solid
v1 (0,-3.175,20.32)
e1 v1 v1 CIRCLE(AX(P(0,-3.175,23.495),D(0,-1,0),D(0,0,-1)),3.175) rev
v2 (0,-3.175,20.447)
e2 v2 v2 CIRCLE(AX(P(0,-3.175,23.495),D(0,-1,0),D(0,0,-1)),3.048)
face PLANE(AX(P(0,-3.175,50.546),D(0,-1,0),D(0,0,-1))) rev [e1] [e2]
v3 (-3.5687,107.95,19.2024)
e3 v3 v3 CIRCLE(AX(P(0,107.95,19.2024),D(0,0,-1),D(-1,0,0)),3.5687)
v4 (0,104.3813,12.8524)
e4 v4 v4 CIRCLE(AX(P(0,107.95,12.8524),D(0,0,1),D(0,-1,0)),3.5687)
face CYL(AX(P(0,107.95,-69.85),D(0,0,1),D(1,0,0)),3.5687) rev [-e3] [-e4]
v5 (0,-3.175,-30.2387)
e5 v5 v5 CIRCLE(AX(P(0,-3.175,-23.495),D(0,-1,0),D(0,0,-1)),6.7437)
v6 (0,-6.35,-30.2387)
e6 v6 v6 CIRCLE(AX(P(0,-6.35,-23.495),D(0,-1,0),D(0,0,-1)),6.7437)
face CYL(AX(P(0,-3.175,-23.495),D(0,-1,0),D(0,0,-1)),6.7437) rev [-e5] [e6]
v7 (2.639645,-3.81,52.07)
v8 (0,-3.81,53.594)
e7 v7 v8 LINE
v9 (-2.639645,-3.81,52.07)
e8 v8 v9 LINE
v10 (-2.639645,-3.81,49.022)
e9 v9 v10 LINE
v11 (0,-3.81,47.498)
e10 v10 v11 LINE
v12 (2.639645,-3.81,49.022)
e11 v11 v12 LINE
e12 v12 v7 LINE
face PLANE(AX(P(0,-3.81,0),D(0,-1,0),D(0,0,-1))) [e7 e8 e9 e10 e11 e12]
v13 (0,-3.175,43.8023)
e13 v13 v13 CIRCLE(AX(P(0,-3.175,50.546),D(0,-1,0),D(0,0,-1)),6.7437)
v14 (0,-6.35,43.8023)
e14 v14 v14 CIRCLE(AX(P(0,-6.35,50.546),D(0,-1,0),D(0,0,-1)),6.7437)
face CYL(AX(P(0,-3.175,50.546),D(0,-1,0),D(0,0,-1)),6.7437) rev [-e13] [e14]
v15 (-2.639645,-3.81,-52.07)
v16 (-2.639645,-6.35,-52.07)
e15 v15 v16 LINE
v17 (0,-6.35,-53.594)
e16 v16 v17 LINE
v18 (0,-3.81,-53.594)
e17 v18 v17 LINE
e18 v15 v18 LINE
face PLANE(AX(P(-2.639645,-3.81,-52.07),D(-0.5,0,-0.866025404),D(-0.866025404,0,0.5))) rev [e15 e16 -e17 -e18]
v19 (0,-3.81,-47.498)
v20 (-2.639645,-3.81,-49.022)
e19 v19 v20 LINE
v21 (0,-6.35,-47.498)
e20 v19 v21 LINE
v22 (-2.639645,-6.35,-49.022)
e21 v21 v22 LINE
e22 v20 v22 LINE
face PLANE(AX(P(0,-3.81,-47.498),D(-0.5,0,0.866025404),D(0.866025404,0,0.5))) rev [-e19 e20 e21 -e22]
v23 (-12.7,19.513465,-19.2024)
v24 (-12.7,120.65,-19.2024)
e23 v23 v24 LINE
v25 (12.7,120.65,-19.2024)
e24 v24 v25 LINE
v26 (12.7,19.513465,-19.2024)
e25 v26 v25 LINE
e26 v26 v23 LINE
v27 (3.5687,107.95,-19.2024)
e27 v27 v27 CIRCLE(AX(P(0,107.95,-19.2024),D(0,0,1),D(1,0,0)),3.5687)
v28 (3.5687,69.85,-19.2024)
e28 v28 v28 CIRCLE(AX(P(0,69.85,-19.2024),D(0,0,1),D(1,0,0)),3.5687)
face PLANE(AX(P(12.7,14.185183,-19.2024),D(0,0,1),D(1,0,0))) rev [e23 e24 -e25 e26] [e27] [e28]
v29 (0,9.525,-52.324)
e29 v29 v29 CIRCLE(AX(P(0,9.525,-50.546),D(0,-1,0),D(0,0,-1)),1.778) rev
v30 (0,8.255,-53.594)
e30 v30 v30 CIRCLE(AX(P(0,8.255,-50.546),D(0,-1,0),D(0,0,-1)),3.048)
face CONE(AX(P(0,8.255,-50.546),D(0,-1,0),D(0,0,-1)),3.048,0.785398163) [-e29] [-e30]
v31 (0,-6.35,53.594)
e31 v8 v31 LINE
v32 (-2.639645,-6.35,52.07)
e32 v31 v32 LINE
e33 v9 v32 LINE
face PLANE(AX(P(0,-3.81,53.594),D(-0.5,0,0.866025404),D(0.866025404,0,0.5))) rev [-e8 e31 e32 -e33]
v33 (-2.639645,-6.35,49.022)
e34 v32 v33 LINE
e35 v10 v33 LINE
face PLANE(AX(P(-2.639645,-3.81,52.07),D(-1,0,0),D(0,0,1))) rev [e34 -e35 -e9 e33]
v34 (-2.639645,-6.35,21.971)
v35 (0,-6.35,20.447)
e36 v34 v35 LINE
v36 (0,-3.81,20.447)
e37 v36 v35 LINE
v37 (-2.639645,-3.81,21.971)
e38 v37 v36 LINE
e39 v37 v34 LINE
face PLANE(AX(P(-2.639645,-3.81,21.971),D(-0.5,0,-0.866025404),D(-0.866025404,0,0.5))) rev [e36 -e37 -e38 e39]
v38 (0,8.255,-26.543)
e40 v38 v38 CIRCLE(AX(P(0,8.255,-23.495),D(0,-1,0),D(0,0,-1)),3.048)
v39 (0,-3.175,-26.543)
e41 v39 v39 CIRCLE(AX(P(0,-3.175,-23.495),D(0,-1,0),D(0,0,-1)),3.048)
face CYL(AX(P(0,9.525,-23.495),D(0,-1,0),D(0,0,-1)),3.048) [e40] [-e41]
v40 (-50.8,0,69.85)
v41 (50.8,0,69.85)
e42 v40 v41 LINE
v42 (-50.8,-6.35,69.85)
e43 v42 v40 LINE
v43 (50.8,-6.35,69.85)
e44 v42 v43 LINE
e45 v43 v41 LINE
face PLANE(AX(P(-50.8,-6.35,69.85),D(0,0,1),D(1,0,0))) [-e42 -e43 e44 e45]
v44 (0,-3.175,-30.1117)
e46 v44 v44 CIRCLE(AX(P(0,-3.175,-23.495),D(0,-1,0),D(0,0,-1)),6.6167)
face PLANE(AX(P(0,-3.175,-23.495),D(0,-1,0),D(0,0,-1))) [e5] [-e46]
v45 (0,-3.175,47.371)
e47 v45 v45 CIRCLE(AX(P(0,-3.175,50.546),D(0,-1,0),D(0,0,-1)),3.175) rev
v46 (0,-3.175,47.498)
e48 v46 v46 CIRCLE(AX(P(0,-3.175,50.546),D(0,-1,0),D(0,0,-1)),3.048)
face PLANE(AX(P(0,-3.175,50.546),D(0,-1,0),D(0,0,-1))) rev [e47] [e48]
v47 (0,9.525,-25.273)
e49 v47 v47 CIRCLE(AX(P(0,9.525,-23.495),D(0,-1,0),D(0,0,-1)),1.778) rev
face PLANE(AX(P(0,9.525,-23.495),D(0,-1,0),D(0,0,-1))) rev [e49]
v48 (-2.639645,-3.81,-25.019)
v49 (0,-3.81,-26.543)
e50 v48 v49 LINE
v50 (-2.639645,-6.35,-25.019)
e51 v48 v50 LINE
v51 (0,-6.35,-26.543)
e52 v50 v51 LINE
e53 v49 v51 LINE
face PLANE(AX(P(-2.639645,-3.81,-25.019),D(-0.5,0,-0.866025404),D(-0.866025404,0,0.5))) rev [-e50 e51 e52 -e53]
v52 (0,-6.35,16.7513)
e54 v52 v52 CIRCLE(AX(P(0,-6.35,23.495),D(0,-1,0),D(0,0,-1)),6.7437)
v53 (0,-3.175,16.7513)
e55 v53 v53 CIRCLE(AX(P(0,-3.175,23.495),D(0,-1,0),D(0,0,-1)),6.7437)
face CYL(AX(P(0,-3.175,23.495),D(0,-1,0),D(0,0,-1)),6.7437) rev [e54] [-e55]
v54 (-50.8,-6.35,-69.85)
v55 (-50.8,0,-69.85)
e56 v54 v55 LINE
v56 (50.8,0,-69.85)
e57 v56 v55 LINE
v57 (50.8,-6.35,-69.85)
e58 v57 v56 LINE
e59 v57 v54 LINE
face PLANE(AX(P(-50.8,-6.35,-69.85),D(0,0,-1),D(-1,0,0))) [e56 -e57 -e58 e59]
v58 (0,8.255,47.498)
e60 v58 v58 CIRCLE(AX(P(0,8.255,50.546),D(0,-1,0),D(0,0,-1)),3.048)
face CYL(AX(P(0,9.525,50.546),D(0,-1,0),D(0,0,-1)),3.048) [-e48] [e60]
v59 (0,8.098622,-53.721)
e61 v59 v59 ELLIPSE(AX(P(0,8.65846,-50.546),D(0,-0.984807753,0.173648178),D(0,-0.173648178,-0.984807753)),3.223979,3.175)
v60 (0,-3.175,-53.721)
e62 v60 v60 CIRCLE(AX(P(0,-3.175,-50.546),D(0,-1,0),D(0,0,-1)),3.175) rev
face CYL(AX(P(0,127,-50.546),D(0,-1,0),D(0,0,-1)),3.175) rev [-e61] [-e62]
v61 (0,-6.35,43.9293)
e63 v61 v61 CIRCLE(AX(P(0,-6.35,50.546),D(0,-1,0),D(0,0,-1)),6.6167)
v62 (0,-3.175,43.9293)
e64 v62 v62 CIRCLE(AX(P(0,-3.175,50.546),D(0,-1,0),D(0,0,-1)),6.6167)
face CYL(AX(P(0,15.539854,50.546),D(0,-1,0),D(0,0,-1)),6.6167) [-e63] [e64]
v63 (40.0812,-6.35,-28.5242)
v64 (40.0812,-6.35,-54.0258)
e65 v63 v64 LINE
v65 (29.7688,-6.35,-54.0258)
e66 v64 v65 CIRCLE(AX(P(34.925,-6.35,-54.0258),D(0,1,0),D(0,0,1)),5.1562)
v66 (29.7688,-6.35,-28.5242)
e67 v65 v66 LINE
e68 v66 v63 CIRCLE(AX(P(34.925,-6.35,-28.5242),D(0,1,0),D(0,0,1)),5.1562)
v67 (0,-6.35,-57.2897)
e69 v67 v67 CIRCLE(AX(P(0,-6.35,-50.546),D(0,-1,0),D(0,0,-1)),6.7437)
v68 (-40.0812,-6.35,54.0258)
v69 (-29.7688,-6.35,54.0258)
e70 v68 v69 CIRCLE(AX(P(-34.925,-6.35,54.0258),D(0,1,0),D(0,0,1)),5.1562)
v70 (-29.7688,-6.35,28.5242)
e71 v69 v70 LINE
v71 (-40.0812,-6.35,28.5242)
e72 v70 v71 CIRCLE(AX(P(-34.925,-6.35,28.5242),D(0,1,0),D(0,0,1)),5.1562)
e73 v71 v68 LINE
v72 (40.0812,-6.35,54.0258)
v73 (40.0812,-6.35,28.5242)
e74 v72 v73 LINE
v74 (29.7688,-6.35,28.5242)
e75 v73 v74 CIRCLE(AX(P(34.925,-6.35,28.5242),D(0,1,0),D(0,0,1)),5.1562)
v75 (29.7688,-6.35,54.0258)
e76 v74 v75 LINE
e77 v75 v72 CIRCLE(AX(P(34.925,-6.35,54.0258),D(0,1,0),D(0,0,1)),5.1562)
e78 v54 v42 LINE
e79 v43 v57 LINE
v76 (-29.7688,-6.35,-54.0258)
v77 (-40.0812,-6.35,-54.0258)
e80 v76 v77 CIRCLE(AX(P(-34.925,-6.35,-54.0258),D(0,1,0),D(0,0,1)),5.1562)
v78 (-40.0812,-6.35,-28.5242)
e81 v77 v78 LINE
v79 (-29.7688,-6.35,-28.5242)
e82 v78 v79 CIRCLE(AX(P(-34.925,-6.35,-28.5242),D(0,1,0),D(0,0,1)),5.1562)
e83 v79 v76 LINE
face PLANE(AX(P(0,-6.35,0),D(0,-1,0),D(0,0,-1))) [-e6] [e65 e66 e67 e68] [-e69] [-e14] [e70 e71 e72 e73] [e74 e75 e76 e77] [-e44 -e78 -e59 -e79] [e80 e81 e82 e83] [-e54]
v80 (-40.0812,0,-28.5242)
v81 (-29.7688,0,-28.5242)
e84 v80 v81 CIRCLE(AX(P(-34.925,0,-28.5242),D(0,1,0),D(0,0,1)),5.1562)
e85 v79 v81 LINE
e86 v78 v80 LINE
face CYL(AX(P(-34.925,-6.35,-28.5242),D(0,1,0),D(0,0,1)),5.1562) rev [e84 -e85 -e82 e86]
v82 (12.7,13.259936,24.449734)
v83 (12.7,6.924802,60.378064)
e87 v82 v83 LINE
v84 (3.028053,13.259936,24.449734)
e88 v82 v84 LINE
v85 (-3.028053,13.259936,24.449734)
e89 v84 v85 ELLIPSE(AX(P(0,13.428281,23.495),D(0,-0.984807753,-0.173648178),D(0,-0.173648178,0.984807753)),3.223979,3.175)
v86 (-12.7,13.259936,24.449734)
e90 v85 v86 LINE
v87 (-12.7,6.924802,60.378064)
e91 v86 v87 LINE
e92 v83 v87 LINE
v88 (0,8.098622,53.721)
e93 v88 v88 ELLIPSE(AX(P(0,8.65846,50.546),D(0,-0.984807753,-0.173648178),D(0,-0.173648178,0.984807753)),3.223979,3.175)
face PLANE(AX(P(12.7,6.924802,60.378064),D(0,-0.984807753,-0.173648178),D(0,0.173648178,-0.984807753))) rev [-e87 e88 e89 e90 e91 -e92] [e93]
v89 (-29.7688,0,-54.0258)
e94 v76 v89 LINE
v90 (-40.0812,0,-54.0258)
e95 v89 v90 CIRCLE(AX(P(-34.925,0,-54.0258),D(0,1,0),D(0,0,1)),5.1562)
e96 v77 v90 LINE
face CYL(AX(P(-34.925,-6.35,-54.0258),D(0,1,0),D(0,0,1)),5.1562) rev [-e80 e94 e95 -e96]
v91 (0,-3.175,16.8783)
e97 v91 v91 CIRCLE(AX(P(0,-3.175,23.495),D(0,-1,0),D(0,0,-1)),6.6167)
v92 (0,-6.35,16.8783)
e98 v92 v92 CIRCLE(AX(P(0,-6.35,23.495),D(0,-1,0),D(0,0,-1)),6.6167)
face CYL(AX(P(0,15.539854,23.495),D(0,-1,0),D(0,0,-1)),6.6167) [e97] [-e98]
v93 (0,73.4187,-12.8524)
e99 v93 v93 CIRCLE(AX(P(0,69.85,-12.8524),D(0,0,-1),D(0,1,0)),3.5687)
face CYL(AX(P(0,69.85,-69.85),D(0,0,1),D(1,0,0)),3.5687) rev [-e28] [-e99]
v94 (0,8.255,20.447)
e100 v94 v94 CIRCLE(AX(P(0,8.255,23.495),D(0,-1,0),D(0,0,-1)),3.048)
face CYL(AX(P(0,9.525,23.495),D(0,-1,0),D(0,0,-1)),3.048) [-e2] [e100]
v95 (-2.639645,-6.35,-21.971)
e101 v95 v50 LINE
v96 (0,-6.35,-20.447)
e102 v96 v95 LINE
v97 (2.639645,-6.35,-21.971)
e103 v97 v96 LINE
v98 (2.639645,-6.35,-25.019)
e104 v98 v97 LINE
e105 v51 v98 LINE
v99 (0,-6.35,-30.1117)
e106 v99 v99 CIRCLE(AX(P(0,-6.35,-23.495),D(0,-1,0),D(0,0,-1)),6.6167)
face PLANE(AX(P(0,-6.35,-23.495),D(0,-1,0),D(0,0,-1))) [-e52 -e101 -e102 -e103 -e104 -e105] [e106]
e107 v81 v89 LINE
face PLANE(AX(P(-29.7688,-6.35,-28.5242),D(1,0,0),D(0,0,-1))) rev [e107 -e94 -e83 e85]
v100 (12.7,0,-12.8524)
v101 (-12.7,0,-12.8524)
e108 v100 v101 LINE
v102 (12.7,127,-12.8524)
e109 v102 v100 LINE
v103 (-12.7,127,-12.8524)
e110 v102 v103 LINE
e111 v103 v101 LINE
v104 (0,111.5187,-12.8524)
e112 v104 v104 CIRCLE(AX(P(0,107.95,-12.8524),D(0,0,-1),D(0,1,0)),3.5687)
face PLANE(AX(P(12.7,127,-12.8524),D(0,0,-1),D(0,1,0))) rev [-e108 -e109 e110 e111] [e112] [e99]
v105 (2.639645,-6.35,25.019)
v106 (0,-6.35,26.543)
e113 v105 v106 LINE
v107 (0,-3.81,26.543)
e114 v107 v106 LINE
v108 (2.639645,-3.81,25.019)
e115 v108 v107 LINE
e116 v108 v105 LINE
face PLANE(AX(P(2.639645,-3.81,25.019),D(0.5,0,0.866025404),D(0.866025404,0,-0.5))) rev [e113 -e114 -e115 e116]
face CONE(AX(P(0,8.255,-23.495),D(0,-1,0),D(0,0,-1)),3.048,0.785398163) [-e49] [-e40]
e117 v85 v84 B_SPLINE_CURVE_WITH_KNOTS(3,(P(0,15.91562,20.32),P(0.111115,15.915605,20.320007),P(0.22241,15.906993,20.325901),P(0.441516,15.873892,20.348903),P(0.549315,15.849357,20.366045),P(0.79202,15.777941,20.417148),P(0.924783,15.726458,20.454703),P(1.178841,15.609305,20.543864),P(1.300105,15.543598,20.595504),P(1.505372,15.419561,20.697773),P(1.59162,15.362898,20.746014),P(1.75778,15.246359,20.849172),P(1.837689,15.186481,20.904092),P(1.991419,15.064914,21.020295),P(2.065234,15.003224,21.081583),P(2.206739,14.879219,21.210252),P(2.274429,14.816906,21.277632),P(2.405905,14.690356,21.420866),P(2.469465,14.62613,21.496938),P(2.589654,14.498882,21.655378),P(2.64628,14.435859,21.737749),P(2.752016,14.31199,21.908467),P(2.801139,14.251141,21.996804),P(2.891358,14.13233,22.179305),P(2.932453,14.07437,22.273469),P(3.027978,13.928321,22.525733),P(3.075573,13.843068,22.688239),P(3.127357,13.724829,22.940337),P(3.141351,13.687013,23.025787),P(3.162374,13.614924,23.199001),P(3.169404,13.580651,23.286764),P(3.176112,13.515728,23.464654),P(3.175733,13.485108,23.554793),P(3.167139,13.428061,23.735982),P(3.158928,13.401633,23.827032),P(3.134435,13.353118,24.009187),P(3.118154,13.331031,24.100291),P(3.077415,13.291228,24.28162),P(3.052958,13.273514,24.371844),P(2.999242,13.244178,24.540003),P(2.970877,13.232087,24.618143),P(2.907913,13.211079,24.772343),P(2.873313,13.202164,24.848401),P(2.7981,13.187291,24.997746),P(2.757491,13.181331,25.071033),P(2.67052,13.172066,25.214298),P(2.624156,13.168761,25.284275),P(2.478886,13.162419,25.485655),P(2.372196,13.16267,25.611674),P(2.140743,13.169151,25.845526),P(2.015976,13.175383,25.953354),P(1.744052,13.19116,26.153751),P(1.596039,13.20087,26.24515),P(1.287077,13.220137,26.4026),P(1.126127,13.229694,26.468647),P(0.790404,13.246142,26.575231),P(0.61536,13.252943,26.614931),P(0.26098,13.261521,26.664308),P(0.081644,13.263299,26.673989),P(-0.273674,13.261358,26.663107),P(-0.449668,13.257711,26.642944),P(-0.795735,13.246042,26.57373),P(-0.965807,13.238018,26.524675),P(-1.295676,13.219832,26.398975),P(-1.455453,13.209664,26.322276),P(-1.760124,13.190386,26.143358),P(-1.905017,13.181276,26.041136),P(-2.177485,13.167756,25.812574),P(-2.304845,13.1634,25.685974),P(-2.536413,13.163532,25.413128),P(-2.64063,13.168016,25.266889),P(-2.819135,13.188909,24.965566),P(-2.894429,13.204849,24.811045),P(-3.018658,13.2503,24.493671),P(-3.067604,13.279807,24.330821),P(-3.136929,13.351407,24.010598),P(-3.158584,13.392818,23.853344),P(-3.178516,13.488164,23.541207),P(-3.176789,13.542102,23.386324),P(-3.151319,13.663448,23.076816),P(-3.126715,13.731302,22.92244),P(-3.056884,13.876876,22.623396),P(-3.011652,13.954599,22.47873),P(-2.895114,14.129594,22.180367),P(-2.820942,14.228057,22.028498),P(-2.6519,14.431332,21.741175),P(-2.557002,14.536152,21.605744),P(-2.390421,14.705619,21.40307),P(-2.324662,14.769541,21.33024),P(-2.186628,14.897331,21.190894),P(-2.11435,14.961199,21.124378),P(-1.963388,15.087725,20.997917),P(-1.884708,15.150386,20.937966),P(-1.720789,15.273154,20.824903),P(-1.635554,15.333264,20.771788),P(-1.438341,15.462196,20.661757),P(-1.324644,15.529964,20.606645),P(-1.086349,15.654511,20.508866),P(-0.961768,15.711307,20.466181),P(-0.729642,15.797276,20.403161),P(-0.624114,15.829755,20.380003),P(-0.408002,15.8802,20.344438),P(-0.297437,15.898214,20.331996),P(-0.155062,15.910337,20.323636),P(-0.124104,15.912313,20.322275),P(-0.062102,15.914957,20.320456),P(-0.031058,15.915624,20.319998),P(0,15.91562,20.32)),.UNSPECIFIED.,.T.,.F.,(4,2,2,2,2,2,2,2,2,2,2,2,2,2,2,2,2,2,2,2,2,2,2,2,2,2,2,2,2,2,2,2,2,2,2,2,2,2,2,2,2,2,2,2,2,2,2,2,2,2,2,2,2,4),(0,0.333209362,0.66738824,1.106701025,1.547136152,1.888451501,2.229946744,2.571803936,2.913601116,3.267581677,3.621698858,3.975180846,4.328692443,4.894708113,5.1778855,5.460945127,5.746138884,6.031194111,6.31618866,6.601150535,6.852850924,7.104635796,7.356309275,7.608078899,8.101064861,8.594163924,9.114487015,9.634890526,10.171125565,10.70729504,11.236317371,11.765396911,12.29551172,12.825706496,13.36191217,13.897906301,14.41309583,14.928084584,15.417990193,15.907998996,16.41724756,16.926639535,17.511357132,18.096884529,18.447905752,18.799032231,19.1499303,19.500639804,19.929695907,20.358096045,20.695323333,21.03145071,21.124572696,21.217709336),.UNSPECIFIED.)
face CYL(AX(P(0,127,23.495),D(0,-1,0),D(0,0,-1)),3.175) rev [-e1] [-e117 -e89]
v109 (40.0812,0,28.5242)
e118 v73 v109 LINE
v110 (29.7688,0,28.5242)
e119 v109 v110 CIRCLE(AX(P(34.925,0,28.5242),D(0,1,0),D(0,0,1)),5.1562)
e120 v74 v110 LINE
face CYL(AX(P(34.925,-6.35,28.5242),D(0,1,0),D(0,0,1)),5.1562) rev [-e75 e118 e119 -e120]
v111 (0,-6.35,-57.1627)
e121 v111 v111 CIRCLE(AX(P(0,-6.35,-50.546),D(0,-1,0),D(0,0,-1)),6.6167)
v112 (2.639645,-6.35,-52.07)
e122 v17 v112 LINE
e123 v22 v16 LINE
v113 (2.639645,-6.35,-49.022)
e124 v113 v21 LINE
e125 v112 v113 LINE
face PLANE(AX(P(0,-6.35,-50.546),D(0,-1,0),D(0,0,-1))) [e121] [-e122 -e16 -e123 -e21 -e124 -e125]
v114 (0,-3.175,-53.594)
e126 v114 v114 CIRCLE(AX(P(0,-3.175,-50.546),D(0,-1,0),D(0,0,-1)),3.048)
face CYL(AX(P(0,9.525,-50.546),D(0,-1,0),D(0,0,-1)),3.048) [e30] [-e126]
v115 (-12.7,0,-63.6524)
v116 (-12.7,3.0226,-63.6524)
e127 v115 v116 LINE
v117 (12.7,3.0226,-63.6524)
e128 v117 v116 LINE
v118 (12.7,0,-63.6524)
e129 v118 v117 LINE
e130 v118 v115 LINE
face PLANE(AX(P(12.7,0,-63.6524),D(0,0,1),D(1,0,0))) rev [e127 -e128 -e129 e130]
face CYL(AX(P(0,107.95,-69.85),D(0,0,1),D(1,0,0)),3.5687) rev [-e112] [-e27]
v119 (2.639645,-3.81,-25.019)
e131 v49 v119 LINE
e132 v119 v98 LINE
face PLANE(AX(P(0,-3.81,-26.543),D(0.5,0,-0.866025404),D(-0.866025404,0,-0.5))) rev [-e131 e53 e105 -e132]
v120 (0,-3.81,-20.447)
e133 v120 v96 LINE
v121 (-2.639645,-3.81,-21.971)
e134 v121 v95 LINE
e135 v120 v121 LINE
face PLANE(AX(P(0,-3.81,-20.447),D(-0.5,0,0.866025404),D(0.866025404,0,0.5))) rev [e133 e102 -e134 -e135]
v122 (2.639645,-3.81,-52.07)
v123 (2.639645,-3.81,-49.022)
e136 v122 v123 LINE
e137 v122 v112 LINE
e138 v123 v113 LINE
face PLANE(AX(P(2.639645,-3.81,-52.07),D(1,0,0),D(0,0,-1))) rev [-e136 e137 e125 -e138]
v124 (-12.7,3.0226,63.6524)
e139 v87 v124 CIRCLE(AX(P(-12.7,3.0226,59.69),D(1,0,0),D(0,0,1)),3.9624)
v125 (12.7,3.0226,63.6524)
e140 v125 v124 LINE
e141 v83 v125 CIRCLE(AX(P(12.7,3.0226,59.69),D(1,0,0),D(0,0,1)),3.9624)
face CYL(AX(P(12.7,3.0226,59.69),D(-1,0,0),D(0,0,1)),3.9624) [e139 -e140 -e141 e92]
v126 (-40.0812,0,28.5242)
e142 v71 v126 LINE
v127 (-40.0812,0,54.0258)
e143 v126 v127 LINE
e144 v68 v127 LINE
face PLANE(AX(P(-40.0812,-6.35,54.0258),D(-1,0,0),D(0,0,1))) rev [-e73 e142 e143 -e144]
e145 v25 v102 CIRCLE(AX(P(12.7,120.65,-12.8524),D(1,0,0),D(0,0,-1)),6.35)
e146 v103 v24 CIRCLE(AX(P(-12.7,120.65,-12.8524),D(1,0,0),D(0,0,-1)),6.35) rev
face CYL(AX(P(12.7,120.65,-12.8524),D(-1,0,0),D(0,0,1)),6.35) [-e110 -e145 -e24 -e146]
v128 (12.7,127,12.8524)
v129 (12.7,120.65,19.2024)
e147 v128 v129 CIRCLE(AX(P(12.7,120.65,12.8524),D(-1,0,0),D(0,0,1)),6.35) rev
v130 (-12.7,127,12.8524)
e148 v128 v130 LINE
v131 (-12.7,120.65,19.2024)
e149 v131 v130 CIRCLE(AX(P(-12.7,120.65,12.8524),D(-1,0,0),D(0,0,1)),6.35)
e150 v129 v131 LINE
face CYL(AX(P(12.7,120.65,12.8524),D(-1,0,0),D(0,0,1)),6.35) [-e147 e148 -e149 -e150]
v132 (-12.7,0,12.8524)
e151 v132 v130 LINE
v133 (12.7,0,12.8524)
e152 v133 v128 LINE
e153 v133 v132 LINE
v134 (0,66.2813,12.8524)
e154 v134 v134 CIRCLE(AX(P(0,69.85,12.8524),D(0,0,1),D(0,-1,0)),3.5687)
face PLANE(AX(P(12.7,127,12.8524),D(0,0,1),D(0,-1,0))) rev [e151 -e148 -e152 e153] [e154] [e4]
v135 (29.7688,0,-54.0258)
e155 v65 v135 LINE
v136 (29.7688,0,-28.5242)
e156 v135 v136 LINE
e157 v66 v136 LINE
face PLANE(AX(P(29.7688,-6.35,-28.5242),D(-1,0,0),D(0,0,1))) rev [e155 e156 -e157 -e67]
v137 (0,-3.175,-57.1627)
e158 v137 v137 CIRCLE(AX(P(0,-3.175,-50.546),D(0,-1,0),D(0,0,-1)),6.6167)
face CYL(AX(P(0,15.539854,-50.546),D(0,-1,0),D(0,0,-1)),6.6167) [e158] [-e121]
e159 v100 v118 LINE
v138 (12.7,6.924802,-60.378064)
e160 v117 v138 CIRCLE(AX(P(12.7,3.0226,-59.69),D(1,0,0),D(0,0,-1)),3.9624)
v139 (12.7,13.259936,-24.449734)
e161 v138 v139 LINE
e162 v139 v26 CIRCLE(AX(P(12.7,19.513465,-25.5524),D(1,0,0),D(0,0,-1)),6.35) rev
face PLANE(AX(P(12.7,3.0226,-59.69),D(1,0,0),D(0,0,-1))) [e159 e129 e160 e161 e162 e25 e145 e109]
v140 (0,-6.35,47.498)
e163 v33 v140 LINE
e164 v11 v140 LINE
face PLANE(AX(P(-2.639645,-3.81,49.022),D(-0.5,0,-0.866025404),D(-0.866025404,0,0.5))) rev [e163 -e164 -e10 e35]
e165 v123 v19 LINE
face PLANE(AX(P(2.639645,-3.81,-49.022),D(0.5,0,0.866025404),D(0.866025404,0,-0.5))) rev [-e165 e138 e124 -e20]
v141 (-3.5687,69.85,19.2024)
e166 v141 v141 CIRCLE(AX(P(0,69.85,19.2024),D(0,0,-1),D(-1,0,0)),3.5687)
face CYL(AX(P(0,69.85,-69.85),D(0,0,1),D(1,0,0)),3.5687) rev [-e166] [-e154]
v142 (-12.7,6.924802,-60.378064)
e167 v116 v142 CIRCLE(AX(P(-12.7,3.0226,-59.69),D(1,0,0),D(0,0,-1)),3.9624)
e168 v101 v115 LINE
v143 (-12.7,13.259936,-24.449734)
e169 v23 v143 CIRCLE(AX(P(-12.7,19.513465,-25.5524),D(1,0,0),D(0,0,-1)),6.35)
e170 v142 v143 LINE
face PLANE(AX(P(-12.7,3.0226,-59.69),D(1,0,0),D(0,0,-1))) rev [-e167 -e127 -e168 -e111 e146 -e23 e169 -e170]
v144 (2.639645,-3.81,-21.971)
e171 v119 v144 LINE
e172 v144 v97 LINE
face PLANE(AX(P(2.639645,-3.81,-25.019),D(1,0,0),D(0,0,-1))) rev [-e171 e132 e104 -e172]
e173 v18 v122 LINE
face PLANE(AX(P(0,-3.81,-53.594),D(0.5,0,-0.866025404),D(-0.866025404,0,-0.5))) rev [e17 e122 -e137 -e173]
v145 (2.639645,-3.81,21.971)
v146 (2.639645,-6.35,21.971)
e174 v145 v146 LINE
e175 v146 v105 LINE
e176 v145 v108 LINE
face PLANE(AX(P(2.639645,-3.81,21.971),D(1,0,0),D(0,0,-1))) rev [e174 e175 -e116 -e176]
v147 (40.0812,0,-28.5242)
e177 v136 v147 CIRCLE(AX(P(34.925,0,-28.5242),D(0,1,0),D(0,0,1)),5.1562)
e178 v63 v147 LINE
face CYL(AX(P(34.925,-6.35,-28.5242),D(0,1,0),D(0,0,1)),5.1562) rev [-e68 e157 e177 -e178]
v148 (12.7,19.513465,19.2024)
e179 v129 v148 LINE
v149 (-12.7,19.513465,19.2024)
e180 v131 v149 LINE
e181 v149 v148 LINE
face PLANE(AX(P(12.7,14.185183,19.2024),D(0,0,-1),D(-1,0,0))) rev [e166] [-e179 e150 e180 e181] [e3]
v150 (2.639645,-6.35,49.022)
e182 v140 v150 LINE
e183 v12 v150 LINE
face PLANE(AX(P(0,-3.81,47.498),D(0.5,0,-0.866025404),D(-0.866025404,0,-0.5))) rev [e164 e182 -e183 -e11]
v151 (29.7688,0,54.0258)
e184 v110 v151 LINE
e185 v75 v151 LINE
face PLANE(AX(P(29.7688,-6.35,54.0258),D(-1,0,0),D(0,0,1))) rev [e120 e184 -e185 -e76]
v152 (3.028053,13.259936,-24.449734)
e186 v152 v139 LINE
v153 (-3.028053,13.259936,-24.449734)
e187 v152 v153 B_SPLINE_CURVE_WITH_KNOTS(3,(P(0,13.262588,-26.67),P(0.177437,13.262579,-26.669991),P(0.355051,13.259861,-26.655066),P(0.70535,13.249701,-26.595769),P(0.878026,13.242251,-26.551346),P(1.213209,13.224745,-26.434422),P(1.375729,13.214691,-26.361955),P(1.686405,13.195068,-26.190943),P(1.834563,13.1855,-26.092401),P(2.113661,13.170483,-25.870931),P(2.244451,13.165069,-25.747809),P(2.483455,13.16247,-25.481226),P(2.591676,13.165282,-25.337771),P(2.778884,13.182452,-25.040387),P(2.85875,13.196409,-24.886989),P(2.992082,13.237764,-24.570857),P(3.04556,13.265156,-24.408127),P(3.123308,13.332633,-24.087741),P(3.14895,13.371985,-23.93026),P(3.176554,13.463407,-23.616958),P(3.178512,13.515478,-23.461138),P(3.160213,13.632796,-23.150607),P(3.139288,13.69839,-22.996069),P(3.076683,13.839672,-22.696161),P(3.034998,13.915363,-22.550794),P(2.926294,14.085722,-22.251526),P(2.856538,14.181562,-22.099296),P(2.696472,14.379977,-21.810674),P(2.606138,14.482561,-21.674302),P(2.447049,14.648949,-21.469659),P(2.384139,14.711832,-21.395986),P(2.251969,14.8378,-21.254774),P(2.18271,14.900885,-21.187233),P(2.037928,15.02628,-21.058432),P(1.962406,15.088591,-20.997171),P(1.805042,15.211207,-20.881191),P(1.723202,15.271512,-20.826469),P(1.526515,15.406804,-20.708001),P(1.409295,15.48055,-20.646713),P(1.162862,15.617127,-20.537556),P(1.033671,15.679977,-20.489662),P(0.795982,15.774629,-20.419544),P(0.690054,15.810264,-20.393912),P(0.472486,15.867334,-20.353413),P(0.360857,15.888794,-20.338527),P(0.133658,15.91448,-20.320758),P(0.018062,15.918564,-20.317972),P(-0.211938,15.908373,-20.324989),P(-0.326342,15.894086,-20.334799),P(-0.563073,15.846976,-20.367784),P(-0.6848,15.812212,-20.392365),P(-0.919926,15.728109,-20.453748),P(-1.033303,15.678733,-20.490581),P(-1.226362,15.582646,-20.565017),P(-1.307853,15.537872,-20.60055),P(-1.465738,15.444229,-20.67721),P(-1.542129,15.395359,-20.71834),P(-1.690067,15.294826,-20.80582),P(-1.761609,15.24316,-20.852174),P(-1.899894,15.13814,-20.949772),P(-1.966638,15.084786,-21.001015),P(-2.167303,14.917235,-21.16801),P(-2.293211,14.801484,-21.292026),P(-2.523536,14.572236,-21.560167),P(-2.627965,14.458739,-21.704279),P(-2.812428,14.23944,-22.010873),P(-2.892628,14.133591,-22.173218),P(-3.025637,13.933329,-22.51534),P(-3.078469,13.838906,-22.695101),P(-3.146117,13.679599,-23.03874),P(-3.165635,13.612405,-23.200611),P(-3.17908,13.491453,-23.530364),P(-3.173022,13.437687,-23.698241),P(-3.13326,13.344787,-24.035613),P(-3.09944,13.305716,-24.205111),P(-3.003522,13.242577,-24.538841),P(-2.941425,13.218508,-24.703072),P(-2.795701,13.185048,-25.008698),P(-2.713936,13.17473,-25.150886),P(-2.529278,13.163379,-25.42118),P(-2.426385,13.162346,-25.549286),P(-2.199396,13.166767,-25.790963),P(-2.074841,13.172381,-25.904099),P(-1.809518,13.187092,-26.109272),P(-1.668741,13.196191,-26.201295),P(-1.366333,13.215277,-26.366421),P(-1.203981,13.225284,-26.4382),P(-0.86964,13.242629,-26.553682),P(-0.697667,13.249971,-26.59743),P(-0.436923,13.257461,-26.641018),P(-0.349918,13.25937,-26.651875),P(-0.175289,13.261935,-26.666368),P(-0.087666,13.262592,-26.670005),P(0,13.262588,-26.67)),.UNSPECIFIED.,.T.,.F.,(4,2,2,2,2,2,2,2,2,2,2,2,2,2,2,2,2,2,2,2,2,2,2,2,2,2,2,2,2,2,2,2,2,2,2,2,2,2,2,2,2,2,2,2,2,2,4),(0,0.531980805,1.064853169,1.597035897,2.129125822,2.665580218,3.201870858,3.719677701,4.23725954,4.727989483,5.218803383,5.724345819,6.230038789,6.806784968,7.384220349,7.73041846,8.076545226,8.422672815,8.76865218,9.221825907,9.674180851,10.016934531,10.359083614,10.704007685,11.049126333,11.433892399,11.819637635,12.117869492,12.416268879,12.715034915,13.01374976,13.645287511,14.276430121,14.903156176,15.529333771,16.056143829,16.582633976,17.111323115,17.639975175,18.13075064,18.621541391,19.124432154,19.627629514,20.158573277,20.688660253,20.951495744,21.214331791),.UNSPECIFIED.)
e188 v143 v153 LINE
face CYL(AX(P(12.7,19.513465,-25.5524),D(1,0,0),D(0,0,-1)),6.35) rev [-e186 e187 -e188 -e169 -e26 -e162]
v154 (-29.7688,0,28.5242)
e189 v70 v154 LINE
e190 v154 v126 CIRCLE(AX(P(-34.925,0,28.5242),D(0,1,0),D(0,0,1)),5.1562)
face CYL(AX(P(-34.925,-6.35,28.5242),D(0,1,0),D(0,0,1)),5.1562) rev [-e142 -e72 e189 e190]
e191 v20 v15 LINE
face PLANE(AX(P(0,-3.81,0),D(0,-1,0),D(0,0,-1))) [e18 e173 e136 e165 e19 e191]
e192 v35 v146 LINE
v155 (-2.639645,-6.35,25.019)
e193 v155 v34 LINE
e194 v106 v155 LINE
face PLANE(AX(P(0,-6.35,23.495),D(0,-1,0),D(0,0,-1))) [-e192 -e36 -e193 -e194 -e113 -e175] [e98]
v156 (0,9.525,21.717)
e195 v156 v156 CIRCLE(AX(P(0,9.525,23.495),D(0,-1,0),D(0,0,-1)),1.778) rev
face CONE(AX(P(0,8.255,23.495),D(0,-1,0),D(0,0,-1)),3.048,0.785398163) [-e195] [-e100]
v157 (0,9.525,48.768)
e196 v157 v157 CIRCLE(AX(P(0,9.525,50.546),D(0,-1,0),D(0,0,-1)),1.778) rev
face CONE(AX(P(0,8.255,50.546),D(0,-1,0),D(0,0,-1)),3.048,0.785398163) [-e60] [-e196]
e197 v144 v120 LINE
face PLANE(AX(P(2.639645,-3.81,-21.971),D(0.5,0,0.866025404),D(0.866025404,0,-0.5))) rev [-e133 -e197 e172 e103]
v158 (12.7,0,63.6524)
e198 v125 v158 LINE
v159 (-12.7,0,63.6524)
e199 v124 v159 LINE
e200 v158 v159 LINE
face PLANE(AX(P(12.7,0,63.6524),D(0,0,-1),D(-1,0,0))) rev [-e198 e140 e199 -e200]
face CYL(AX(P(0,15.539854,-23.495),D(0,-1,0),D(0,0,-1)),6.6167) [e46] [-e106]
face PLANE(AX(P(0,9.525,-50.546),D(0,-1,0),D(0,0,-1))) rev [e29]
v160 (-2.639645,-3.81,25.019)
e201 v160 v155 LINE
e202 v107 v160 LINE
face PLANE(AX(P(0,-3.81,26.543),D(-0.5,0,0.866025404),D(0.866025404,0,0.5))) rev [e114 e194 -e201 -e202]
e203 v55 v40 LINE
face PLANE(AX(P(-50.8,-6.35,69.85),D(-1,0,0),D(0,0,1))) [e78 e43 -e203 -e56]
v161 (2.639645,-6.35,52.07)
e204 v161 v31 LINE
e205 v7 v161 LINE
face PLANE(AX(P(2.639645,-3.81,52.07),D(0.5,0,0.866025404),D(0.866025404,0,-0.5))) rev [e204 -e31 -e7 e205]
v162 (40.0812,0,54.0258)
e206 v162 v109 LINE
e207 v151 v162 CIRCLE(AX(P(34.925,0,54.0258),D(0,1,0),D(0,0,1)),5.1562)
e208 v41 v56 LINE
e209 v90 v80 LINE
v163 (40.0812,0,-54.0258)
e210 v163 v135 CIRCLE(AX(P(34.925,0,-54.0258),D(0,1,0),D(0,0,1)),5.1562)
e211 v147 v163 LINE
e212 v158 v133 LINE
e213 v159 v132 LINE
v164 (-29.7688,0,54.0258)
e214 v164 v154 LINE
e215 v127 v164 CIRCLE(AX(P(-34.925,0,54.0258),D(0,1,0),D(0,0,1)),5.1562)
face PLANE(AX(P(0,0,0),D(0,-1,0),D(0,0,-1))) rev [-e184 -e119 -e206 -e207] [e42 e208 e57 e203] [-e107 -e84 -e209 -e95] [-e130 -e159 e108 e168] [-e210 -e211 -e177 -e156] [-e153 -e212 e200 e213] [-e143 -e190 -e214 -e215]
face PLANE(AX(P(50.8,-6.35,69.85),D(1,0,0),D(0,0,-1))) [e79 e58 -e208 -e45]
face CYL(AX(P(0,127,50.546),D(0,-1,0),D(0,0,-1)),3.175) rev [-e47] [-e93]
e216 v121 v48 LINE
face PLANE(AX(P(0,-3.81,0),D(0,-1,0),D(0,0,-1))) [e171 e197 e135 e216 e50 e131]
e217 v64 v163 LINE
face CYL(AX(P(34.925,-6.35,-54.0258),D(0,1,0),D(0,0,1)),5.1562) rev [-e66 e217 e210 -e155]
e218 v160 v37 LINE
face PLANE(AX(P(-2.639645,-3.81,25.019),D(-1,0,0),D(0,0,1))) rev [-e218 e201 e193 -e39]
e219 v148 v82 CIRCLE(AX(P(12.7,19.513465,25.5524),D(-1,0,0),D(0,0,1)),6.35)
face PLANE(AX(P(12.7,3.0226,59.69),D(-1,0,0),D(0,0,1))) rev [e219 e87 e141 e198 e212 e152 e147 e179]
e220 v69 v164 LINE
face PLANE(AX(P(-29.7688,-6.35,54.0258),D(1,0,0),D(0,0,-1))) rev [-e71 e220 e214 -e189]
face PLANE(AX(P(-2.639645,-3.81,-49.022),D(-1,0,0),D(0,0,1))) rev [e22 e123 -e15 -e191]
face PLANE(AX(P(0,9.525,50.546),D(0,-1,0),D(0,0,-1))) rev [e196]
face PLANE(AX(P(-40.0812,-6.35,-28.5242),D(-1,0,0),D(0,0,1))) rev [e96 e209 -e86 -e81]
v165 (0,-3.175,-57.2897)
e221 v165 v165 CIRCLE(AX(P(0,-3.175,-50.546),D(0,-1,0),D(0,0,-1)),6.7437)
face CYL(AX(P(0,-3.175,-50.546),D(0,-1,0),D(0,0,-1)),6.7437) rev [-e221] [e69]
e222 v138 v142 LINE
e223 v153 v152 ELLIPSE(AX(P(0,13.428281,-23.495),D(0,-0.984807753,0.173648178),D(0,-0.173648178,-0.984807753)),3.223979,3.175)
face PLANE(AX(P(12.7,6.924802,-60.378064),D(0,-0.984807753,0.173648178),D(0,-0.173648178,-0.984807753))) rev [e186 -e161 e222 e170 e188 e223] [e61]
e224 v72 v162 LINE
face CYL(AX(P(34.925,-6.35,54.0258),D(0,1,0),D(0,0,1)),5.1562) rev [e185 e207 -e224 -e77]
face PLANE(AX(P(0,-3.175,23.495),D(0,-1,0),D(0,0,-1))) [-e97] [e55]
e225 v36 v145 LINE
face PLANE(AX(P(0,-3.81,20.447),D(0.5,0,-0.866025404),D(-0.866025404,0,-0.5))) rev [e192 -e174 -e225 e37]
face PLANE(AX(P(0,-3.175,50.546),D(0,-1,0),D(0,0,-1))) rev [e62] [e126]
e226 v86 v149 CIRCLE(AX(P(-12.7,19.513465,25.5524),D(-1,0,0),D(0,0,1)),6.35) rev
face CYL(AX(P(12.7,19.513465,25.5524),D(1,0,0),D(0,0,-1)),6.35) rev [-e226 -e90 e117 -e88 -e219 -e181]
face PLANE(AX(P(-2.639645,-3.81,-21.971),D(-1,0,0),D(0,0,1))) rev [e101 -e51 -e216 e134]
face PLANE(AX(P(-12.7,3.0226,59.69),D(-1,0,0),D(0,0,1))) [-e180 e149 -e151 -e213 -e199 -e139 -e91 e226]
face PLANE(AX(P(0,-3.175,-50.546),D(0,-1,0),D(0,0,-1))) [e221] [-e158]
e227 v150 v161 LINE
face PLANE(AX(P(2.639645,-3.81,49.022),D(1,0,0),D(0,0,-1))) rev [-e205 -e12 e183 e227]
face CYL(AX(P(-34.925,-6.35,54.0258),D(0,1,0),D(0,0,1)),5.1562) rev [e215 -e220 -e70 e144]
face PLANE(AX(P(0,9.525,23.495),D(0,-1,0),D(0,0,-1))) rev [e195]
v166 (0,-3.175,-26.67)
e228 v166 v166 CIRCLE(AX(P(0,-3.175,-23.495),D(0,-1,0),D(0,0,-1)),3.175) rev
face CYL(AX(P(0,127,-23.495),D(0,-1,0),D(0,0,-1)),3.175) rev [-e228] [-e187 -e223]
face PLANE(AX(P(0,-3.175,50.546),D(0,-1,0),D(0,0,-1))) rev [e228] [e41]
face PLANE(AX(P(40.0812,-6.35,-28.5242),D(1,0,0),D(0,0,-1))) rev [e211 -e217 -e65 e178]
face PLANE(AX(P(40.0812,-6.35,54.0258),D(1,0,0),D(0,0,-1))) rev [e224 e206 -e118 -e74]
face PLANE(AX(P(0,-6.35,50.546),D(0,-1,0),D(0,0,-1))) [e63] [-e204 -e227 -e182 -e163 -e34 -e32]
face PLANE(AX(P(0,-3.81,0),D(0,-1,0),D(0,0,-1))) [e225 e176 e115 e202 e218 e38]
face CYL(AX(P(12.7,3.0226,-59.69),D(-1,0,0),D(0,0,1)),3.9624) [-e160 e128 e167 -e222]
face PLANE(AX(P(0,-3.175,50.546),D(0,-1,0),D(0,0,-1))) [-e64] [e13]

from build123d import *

# Parameters (mm, degrees)
SKETCH1_W               = 101.6
SKETCH1_H               = 139.7
BOSS_EXTRUDE1_DEPTH     = 6.35
BOSS_EXTRUDE2_DEPTH     = 12.7
FILLET1_R               = 6.35
SKETCH3_R               = 3.175
CUT_EXTRUDE1_DEPTH      = 159.876949241
SKETCH4_R               = 6.7437
CUT_EXTRUDE2_DEPTH      = 3.175
SKETCH5_R               = 3.048
BOSS_EXTRUDE4_DEPTH     = 15.875
BOSS_EXTRUDE4_2_DEPTH   = 15.875
BOSS_EXTRUDE4_3_DEPTH   = 15.875
BOSS_EXTRUDE4_4_DEPTH   = 15.875
SKETCH6_R               = 6.6167
BOSS_EXTRUDE5_DEPTH     = 3.175
CUT_EXTRUDE3_DEPTH      = 2.54
CUT_EXTRUDE4_DEPTH      = 154.586010105
CUT_EXTRUDE4_DEPTH_BACK = 154.586010105
SKETCH8_R               = 3.5687
CHAMFER1_SIZE           = 1.27


with BuildPart() as part:
    # Sketch1 → Boss-Extrude1 (new body)
    with BuildSketch(Plane(origin=(0, 0, 0), x_dir=(1, 0, 0), z_dir=(0, 1, 0))):
        Rectangle(SKETCH1_W, SKETCH1_H)
        with BuildLine():
            Line((-40.0812, 28.5242), (-40.0812, 54.0258))
            ThreePointArc((-40.0812, 54.0258), (-34.925, 59.182), (-29.7688, 54.0258))
            Line((-29.7688, 54.0258), (-29.7688, 28.5242))
            ThreePointArc((-29.7688, 28.5242), (-34.925, 23.368), (-40.0812, 28.5242))
        make_face(mode=Mode.SUBTRACT)
        with BuildLine():
            Line((-40.0812, -54.0258), (-40.0812, -28.5242))
            ThreePointArc((-40.0812, -28.5242), (-34.925, -23.368), (-29.7688, -28.5242))
            Line((-29.7688, -28.5242), (-29.7688, -54.0258))
            ThreePointArc((-29.7688, -54.0258), (-34.925, -59.182), (-40.0812, -54.0258))
        make_face(mode=Mode.SUBTRACT)
        with BuildLine():
            Line((29.7688, -54.0258), (29.7688, -28.5242))
            ThreePointArc((29.7688, -28.5242), (34.925, -23.368), (40.0812, -28.5242))
            Line((40.0812, -28.5242), (40.0812, -54.0258))
            ThreePointArc((40.0812, -54.0258), (34.925, -59.182), (29.7688, -54.0258))
        make_face(mode=Mode.SUBTRACT)
        with BuildLine():
            Line((29.7688, 28.5242), (29.7688, 54.0258))
            ThreePointArc((29.7688, 54.0258), (34.925, 59.182), (40.0812, 54.0258))
            Line((40.0812, 54.0258), (40.0812, 28.5242))
            ThreePointArc((40.0812, 28.5242), (34.925, 23.368), (29.7688, 28.5242))
        make_face(mode=Mode.SUBTRACT)
    extrude(amount=-BOSS_EXTRUDE1_DEPTH)

    # Sketch2 → Boss-Extrude2 (add, symmetric)
    with BuildSketch(Plane(origin=(0, 0, 0), x_dir=(0, 0, -1), z_dir=(1, 0, 0))):
        with BuildLine():
            Line((63.6524, 0), (63.6524, 3.0226))
            ThreePointArc((63.6524, 3.0226), (62.725374501, 5.569581625), (60.378063539, 6.924802241))
            Line((60.378063539, 6.924802241), (19.2024, 14.185182671))
            Line((19.2024, 14.185182671), (19.2024, 127))
            Line((19.2024, 127), (12.8524, 127))
            Line((12.8524, 127), (12.8524, 0))
            Line((12.8524, 0), (63.6524, 0))
        make_face()
        with BuildLine():
            Line((-12.8524, 0), (-63.6524, 0))
            Line((-63.6524, 0), (-63.6524, 3.0226))
            ThreePointArc((-63.6524, 3.0226), (-62.725374501, 5.569581625), (-60.378063539, 6.924802241))
            Line((-60.378063539, 6.924802241), (-19.2024, 14.185182671))
            Line((-19.2024, 14.185182671), (-19.2024, 127))
            Line((-19.2024, 127), (-12.8524, 127))
            Line((-12.8524, 127), (-12.8524, 0))
        make_face()
    extrude(amount=BOSS_EXTRUDE2_DEPTH, both=True)

    # Fillet1
    fillet1_edges = [part.edges().sort_by_distance(p)[0] for p in [
        (0, 14.185182671, 19.2024),
        (0, 127, 19.2024),
        (0, 14.185182671, -19.2024),
        (0, 127, -19.2024),
    ]]
    fillet(fillet1_edges, radius=FILLET1_R - 0.0001)  # a hair under: the kernel refuses the full size

    # Sketch3 → Cut-Extrude1 (cut, through all)
    with BuildSketch(Plane.XZ.offset(6.35)):
        with Locations(Location((0, 50.546, 0), (0, 0, 270))):
            Circle(SKETCH3_R)
        with Locations(Location((0, 23.495, 0), (0, 0, 270))):
            Circle(SKETCH3_R)
        with Locations(Location((0, -23.495, 0), (0, 0, 270))):
            Circle(SKETCH3_R)
        with Locations(Location((0, -50.546, 0), (0, 0, 270))):
            Circle(SKETCH3_R)
    extrude(amount=-CUT_EXTRUDE1_DEPTH, mode=Mode.SUBTRACT)

    # Sketch4 → Cut-Extrude2 (cut)
    with BuildSketch(Plane.XZ.offset(6.35)):
        with Locations(Location((0, 50.546, 0), (0, 0, 270))):
            Circle(SKETCH4_R)
        with Locations(Location((0, 23.495, 0), (0, 0, 270))):
            Circle(SKETCH4_R)
        with Locations(Location((0, -23.495, 0), (0, 0, 270))):
            Circle(SKETCH4_R)
        with Locations(Location((0, -50.546, 0), (0, 0, 270))):
            Circle(SKETCH4_R)
    extrude(amount=-CUT_EXTRUDE2_DEPTH, mode=Mode.SUBTRACT)



with BuildPart() as body_2:
    # Sketch5 → Boss-Extrude4 (new body)
    with BuildSketch(Plane.XZ.offset(6.35)):
        with Locations(Location((0, 50.546, 0), (0, 0, 270))):
            Circle(SKETCH5_R)
    extrude(amount=-BOSS_EXTRUDE4_DEPTH)


with BuildPart() as body_3:
    # Sketch5 → Boss-Extrude4 2 (new body)
    with BuildSketch(Plane.XZ.offset(6.35)):
        with Locations(Location((0, 23.495, 0), (0, 0, 270))):
            Circle(SKETCH5_R)
    extrude(amount=-BOSS_EXTRUDE4_2_DEPTH)


with BuildPart() as body_4:
    # Sketch5 → Boss-Extrude4 3 (new body)
    with BuildSketch(Plane.XZ.offset(6.35)):
        with Locations(Location((0, -23.495, 0), (0, 0, 270))):
            Circle(SKETCH5_R)
    extrude(amount=-BOSS_EXTRUDE4_3_DEPTH)


with BuildPart() as body_5:
    # Sketch5 → Boss-Extrude4 4 (new body)
    with BuildSketch(Plane.XZ.offset(6.35)):
        with Locations(Location((0, -50.546, 0), (0, 0, 270))):
            Circle(SKETCH5_R)
    extrude(amount=-BOSS_EXTRUDE4_4_DEPTH)


with BuildPart() as part_1:
    add(part.part)

    add(body_2.part)  # Boss-Extrude5 merges body 2

    add(body_3.part)  # Boss-Extrude5 merges body 3

    add(body_4.part)  # Boss-Extrude5 merges body 4

    add(body_5.part)  # Boss-Extrude5 merges body 5
    # Sketch6 → Boss-Extrude5 (add)
    with BuildSketch(Plane.XZ.offset(6.35)):
        with Locations(Location((0, 23.495, 0), (0, 0, 270))):
            Circle(SKETCH6_R)
        with Locations(Location((0, 50.546, 0), (0, 0, 270))):
            Circle(SKETCH6_R)
        with Locations(Location((0, -23.495, 0), (0, 0, 270))):
            Circle(SKETCH6_R)
        with Locations(Location((0, -50.546, 0), (0, 0, 270))):
            Circle(SKETCH6_R)
    extrude(amount=-BOSS_EXTRUDE5_DEPTH)

    # Sketch7 → Cut-Extrude3 (cut)
    with BuildSketch(Plane.XZ.offset(6.35)):
        Polygon((0, 47.498), (2.639645431, 49.022), (2.639645431, 52.07), (0, 53.594), (-2.639645431, 52.07), (-2.639645431, 49.022), align=None)
        Polygon((0, 20.447), (2.639645431, 21.971), (2.639645431, 25.019), (0, 26.543), (-2.639645431, 25.019), (-2.639645431, 21.971), align=None)
        Polygon((0, -26.543), (2.639645431, -25.019), (2.639645431, -21.971), (0, -20.447), (-2.639645431, -21.971), (-2.639645431, -25.019), align=None)
        Polygon((0, -53.594), (2.639645431, -52.07), (2.639645431, -49.022), (0, -47.498), (-2.639645431, -49.022), (-2.639645431, -52.07), align=None)
    extrude(amount=-CUT_EXTRUDE3_DEPTH, mode=Mode.SUBTRACT)

    # Sketch8 → Cut-Extrude4 (cut, two sides: drawn at the far end of the back side and taken through both)
    with BuildSketch(Plane.XY.offset(-CUT_EXTRUDE4_DEPTH_BACK)):
        with Locations(Location((0, 69.85, 0), (0, 0, 270))):
            Circle(SKETCH8_R)
        with Locations(Location((0, 107.95, 0), (0, 0, 270))):
            Circle(SKETCH8_R)
    extrude(amount=CUT_EXTRUDE4_DEPTH + CUT_EXTRUDE4_DEPTH_BACK, mode=Mode.SUBTRACT)

    # Chamfer1
    chamfer1_edges = [part_1.edges().sort_by_distance(p)[0] for p in [
        (0, 9.525, 26.543),
        (0, 9.525, 53.594),
        (0, 9.525, -20.447),
        (0, 9.525, -47.498),
    ]]
    chamfer(chamfer1_edges, length=CHAMFER1_SIZE)


solid = part_1.part
